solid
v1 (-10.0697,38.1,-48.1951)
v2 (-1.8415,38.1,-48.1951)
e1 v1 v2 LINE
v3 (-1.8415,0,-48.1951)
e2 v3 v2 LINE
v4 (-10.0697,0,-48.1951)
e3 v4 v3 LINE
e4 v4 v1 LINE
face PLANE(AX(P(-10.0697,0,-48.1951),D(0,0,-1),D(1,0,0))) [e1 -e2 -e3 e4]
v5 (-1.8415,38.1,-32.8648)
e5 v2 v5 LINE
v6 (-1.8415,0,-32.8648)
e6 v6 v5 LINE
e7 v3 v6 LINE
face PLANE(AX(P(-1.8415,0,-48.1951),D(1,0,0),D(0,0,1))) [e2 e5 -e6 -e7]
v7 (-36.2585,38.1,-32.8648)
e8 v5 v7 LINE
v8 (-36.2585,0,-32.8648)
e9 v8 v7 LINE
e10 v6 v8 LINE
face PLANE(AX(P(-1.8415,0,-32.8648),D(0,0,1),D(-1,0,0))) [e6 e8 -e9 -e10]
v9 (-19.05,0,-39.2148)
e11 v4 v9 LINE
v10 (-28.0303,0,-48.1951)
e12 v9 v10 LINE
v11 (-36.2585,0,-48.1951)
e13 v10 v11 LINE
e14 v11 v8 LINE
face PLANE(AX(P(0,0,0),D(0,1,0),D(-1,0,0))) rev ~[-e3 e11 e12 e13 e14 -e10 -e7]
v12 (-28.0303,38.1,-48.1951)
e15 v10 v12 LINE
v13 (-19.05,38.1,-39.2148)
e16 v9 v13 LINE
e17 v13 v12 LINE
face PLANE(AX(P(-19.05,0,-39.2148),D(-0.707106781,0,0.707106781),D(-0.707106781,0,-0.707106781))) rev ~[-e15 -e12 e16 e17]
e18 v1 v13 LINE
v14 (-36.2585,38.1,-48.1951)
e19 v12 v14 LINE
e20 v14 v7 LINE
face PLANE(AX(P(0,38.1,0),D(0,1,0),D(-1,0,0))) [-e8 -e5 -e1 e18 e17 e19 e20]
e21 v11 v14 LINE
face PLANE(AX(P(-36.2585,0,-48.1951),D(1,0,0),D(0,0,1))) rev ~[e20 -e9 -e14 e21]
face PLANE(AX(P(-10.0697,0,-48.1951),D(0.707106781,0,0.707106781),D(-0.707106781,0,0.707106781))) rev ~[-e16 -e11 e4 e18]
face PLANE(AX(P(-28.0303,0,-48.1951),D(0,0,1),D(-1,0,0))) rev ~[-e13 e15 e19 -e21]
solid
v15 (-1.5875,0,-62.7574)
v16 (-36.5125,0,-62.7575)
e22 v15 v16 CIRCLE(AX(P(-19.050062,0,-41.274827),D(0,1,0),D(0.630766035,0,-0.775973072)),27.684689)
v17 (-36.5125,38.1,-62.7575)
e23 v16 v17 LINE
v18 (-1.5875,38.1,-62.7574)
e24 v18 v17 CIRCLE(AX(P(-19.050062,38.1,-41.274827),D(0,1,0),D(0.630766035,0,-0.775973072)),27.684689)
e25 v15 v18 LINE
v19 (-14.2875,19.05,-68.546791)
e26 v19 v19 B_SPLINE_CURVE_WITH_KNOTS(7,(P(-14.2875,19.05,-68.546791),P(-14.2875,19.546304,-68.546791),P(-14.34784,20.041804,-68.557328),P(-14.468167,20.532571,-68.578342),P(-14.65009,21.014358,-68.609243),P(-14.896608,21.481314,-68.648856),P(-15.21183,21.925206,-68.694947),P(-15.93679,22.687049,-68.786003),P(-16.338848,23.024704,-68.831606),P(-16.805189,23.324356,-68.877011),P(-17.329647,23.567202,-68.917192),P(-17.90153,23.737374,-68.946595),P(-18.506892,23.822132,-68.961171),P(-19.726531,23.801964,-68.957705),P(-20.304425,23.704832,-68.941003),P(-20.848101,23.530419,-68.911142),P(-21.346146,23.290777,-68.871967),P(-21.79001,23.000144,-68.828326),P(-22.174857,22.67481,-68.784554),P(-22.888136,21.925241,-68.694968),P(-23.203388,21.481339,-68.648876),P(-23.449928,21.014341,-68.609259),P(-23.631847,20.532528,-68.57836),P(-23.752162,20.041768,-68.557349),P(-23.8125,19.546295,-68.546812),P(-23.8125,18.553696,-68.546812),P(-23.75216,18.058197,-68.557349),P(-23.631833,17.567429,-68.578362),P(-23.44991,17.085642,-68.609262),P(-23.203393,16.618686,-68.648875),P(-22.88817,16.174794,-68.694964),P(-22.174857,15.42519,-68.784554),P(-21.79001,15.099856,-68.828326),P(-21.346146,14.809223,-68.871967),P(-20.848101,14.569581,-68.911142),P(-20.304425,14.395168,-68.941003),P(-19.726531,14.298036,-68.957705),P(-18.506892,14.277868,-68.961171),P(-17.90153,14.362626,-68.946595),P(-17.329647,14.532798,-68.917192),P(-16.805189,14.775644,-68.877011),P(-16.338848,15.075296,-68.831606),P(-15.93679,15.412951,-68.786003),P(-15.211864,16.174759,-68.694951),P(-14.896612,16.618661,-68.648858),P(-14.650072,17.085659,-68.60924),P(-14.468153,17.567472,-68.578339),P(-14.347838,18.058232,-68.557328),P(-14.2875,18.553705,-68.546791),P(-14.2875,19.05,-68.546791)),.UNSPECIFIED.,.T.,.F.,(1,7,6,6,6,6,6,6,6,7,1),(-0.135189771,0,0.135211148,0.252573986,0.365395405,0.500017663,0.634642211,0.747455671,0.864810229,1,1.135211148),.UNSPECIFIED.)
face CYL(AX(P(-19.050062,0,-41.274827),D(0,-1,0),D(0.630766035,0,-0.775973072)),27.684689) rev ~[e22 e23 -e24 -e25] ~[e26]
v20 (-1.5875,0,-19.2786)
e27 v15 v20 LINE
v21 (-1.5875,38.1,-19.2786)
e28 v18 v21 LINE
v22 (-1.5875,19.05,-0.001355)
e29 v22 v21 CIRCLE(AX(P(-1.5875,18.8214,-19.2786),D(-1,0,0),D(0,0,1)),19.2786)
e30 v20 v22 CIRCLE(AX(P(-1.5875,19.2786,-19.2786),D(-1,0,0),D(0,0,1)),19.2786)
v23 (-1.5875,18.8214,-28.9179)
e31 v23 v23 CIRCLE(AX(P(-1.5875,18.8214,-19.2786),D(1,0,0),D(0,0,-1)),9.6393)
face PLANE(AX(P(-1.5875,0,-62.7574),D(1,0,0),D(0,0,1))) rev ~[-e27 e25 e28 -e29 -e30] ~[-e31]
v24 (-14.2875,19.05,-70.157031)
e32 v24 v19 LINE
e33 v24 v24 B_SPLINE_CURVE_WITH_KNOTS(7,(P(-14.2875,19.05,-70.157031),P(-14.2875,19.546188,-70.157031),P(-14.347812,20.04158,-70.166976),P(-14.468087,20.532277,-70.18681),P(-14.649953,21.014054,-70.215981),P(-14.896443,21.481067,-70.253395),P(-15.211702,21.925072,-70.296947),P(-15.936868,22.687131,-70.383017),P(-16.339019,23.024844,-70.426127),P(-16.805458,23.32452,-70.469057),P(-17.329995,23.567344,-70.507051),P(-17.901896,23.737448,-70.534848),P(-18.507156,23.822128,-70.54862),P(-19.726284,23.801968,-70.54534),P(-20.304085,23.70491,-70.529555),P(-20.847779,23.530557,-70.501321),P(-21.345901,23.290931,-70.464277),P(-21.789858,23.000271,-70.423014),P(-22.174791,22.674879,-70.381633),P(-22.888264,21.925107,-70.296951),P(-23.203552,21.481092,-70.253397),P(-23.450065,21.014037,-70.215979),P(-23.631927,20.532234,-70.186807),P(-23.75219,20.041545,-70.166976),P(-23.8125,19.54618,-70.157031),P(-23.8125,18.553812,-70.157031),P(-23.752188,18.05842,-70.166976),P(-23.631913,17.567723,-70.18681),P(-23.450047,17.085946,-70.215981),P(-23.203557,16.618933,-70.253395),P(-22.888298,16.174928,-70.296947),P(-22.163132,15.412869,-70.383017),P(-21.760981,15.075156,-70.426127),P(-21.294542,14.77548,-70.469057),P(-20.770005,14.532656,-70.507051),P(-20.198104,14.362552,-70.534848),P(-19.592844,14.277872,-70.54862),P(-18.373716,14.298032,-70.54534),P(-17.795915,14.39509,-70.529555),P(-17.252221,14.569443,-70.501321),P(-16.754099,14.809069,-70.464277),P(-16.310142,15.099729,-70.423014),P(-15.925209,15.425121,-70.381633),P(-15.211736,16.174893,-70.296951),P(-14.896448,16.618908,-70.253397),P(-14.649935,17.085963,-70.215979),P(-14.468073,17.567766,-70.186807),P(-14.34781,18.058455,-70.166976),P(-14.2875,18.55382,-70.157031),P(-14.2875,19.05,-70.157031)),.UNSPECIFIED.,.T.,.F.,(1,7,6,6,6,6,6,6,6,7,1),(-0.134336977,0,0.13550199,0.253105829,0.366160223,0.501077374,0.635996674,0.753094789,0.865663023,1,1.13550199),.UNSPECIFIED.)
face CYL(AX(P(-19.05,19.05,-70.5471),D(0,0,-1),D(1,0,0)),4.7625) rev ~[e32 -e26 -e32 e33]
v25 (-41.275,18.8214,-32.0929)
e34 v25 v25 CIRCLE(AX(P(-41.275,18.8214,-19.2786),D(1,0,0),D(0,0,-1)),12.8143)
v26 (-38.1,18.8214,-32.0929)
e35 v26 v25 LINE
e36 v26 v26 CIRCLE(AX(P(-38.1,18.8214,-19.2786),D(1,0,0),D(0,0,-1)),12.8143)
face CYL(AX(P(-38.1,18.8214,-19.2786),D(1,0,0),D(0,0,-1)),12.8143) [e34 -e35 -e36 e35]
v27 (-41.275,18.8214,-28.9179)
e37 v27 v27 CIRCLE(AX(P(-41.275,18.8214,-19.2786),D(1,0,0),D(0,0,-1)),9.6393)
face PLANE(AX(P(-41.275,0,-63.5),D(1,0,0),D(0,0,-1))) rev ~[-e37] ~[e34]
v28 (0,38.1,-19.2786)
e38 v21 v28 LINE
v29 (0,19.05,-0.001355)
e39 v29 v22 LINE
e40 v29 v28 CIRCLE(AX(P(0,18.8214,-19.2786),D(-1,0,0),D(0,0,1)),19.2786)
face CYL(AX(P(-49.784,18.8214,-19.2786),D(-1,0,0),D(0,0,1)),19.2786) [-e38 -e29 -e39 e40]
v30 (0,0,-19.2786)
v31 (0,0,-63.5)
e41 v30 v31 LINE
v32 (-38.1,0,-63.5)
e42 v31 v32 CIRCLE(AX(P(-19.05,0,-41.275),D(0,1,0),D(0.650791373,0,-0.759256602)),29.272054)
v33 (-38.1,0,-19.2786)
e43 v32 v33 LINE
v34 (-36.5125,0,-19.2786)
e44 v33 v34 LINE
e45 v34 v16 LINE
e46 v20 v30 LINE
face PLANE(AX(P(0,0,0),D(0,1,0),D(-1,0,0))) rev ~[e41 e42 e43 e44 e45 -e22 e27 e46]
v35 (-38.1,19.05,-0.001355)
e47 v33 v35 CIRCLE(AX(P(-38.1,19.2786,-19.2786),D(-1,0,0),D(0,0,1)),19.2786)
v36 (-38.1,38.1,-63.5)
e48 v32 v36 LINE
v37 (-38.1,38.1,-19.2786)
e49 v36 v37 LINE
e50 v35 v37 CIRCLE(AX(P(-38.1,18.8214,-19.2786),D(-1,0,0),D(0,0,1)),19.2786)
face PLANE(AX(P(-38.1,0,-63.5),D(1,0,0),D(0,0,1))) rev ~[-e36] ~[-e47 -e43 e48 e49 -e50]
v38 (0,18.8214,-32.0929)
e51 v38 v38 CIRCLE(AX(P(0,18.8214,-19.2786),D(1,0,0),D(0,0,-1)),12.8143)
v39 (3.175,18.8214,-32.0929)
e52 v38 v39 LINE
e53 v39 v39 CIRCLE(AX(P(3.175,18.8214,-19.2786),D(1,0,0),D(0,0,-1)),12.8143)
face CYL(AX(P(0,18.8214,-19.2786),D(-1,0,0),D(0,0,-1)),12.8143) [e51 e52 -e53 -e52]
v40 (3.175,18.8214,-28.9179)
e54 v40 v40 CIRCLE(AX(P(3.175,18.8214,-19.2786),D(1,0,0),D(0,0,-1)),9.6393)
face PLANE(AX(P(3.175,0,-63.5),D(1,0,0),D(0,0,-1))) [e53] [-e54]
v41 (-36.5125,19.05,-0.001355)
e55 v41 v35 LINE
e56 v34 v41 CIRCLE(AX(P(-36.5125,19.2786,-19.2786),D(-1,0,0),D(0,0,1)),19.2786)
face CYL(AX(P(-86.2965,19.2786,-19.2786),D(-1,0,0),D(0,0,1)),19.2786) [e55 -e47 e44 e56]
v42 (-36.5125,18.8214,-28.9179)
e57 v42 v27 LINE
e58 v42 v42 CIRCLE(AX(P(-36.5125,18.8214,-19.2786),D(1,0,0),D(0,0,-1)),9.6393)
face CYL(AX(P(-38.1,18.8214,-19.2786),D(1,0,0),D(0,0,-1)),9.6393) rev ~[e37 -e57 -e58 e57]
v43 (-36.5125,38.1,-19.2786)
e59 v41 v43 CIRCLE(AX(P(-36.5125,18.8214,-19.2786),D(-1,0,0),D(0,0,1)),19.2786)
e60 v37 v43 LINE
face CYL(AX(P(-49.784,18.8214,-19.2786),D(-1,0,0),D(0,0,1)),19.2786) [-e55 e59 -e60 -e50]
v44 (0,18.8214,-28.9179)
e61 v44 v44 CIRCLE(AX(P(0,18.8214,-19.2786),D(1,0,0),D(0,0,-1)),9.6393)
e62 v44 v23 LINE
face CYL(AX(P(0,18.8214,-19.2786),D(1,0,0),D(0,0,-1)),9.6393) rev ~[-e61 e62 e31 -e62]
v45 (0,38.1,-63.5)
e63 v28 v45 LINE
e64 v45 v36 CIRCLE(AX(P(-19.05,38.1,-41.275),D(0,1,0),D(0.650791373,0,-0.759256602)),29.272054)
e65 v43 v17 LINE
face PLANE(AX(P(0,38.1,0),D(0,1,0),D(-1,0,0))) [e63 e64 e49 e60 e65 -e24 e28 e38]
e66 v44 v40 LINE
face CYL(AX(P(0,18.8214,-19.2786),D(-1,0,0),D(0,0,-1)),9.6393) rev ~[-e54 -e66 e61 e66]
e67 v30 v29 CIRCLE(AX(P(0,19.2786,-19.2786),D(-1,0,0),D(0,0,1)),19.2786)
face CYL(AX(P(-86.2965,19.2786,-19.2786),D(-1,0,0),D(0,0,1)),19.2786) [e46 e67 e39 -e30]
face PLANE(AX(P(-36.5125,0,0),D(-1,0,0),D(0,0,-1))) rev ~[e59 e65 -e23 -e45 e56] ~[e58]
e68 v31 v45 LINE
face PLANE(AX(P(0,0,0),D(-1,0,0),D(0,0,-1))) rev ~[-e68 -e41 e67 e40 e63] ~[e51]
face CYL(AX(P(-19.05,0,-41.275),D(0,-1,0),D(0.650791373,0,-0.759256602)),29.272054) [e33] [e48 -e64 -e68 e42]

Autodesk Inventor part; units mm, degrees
ref_plane "YZ Plane" through (0, 0, 0) normal (1, 0, 0) x (0, 1, 0)
ref_plane "XZ Plane" through (0, 0, 0) normal (0, 1, 0) x (-1, 0, 0)
ref_plane "XY Plane" through (0, 0, 0) normal (0, 0, 1) x (1, 0, 0)
sketch "Sketch1" plane through (0, 0, 0) normal (0, 1, 0) x (-1, 0, 0)
  line L0 (0, 0) -> (0, -63.5)
  arc A0 (0, -63.5) -> (38.1, -63.5) centre (19.05, -41.275) ccw
  line L1 (38.1, -63.5) -> (38.1, 0)
  line L2 (36.5125, 0) -> (36.5125, -62.7575)
  arc A1 (1.5875, -62.7574) -> (36.5125, -62.7575) centre (19.05, -41.275) ccw
  line L3 (1.5875, -62.7574) -> (1.5875, 0)
  line L4 (38.1, 0) -> (36.5125, 0)
  line L5 (1.5875, 0) -> (0, 0)
  circle A2 centre (19.05, -48.1951) radius 6.35 construction
  line L6 (12.7, -48.1951) -> (1.8415, -48.1951) construction
  line L7 (25.4, -48.1951) -> (36.2585, -48.1951) construction
  line L8 (19.05, -54.5451) -> (19.05, -68.9596) construction
  line L9 (12.7, -48.1951) -> (25.4, -48.1951) construction
  line L10 (10.0697, -48.1951) -> (19.05, -39.2148)
  line L11 (19.05, -39.2148) -> (28.0303, -48.1951)
  line L12 (28.0303, -48.1951) -> (36.2585, -48.1951)
  line L13 (10.0697, -48.1951) -> (1.8415, -48.1951)
  line L14 (1.8415, -32.8648) -> (36.2585, -32.8648)
  line L15 (1.8415, -48.1951) -> (1.8415, -32.8648)
  line L16 (36.2585, -48.1951) -> (36.2585, -32.8648)
  dimension "d0" = 63.5
  dimension "d1" = 38.1
  dimension "d2" = 38.1
  dimension "d3" = 1.5875
  dimension "d19" = 12.7
  dimension "d20" = 22.225
  dimension "d21" = 6.35
  dimension "d24" = 0.254
  dimension "d25" = 14.4145
extrude "Extrusion1" add sketch "Sketch1" along normal blind 38.1 contours L5 L3 A1 L2 L4 L1 A0 L0
ref_plane "Work Plane1" through (-19.05, 0, -70.5471) normal (0, 0, 1) x (1, 0, 0)
fillet "Fillet1" radius 19.2786 4 edges at (-0.7937, 38.1, 0) (-37.3062, 38.1, 0) (-37.3062, 0, 0) (-0.7937, 0, 0)
sketch "Sketch2" plane through (0, 0, -63.5) normal (1, 0, 0) x (0, 0, -1)
  arc A0 (-44.2214, 38.1) -> (-63.5, 18.8214) centre (-44.2214, 18.8214) ccw projected
  line L0 (-44.2268, 0) -> (0, 0) projected
  line L1 (0, 0) -> (0, 38.1) projected
  line L2 (-44.2214, 38.1) -> (0, 38.1) projected
  circle A1 centre (-44.2214, 18.8214) radius 9.6393
  circle A2 centre (-44.2214, 18.8214) radius 12.8143
  arc A3 (-63.5, 18.8214) -> (-44.2268, 0) centre (-44.2268, 19.2786) ccw projected
  point P0 (-63.5, 0)
  dimension "d7" = 19.2786
  dimension "d8" = 3.175
extrude "Extrusion2" cut sketch "Sketch2" against normal through all contours A1
extrude "Extrusion3" add sketch "Sketch2" along normal blind 3.175 contours A2
extrude "Extrusion4" add sketch "Sketch2" against normal blind 3.175 from surface at -38.1 contours A2
sketch "Sketch3" plane through (-19.05, 0, -70.5471) normal (0, 0, 1) x (1, 0, 0)
  line L0 (19.05, 0) -> (-19.05, 0) projected
  line L1 (-19.05, 0) -> (-19.05, 38.1) projected
  line L2 (19.05, 38.1) -> (-19.05, 38.1) projected
  line L3 (19.05, 0) -> (19.05, 38.1) projected
  line L4 (19.05, 38.1) -> (-19.05, 0) construction
  circle A0 centre (0, 19.05) radius 4.7625
  point P0 (19.05, 0)
  dimension "d6" = 19.2786
  dimension "d15" = 9.525
extrude "screw hole" cut sketch "Sketch3" along normal through all contours A0
extrude "Extrusion6" add sketch "Sketch1" along normal up to surface (38.1 mm away) contours L13 L15 L14 L16 L12 L11 L10
properties part number "Clamp Body"
